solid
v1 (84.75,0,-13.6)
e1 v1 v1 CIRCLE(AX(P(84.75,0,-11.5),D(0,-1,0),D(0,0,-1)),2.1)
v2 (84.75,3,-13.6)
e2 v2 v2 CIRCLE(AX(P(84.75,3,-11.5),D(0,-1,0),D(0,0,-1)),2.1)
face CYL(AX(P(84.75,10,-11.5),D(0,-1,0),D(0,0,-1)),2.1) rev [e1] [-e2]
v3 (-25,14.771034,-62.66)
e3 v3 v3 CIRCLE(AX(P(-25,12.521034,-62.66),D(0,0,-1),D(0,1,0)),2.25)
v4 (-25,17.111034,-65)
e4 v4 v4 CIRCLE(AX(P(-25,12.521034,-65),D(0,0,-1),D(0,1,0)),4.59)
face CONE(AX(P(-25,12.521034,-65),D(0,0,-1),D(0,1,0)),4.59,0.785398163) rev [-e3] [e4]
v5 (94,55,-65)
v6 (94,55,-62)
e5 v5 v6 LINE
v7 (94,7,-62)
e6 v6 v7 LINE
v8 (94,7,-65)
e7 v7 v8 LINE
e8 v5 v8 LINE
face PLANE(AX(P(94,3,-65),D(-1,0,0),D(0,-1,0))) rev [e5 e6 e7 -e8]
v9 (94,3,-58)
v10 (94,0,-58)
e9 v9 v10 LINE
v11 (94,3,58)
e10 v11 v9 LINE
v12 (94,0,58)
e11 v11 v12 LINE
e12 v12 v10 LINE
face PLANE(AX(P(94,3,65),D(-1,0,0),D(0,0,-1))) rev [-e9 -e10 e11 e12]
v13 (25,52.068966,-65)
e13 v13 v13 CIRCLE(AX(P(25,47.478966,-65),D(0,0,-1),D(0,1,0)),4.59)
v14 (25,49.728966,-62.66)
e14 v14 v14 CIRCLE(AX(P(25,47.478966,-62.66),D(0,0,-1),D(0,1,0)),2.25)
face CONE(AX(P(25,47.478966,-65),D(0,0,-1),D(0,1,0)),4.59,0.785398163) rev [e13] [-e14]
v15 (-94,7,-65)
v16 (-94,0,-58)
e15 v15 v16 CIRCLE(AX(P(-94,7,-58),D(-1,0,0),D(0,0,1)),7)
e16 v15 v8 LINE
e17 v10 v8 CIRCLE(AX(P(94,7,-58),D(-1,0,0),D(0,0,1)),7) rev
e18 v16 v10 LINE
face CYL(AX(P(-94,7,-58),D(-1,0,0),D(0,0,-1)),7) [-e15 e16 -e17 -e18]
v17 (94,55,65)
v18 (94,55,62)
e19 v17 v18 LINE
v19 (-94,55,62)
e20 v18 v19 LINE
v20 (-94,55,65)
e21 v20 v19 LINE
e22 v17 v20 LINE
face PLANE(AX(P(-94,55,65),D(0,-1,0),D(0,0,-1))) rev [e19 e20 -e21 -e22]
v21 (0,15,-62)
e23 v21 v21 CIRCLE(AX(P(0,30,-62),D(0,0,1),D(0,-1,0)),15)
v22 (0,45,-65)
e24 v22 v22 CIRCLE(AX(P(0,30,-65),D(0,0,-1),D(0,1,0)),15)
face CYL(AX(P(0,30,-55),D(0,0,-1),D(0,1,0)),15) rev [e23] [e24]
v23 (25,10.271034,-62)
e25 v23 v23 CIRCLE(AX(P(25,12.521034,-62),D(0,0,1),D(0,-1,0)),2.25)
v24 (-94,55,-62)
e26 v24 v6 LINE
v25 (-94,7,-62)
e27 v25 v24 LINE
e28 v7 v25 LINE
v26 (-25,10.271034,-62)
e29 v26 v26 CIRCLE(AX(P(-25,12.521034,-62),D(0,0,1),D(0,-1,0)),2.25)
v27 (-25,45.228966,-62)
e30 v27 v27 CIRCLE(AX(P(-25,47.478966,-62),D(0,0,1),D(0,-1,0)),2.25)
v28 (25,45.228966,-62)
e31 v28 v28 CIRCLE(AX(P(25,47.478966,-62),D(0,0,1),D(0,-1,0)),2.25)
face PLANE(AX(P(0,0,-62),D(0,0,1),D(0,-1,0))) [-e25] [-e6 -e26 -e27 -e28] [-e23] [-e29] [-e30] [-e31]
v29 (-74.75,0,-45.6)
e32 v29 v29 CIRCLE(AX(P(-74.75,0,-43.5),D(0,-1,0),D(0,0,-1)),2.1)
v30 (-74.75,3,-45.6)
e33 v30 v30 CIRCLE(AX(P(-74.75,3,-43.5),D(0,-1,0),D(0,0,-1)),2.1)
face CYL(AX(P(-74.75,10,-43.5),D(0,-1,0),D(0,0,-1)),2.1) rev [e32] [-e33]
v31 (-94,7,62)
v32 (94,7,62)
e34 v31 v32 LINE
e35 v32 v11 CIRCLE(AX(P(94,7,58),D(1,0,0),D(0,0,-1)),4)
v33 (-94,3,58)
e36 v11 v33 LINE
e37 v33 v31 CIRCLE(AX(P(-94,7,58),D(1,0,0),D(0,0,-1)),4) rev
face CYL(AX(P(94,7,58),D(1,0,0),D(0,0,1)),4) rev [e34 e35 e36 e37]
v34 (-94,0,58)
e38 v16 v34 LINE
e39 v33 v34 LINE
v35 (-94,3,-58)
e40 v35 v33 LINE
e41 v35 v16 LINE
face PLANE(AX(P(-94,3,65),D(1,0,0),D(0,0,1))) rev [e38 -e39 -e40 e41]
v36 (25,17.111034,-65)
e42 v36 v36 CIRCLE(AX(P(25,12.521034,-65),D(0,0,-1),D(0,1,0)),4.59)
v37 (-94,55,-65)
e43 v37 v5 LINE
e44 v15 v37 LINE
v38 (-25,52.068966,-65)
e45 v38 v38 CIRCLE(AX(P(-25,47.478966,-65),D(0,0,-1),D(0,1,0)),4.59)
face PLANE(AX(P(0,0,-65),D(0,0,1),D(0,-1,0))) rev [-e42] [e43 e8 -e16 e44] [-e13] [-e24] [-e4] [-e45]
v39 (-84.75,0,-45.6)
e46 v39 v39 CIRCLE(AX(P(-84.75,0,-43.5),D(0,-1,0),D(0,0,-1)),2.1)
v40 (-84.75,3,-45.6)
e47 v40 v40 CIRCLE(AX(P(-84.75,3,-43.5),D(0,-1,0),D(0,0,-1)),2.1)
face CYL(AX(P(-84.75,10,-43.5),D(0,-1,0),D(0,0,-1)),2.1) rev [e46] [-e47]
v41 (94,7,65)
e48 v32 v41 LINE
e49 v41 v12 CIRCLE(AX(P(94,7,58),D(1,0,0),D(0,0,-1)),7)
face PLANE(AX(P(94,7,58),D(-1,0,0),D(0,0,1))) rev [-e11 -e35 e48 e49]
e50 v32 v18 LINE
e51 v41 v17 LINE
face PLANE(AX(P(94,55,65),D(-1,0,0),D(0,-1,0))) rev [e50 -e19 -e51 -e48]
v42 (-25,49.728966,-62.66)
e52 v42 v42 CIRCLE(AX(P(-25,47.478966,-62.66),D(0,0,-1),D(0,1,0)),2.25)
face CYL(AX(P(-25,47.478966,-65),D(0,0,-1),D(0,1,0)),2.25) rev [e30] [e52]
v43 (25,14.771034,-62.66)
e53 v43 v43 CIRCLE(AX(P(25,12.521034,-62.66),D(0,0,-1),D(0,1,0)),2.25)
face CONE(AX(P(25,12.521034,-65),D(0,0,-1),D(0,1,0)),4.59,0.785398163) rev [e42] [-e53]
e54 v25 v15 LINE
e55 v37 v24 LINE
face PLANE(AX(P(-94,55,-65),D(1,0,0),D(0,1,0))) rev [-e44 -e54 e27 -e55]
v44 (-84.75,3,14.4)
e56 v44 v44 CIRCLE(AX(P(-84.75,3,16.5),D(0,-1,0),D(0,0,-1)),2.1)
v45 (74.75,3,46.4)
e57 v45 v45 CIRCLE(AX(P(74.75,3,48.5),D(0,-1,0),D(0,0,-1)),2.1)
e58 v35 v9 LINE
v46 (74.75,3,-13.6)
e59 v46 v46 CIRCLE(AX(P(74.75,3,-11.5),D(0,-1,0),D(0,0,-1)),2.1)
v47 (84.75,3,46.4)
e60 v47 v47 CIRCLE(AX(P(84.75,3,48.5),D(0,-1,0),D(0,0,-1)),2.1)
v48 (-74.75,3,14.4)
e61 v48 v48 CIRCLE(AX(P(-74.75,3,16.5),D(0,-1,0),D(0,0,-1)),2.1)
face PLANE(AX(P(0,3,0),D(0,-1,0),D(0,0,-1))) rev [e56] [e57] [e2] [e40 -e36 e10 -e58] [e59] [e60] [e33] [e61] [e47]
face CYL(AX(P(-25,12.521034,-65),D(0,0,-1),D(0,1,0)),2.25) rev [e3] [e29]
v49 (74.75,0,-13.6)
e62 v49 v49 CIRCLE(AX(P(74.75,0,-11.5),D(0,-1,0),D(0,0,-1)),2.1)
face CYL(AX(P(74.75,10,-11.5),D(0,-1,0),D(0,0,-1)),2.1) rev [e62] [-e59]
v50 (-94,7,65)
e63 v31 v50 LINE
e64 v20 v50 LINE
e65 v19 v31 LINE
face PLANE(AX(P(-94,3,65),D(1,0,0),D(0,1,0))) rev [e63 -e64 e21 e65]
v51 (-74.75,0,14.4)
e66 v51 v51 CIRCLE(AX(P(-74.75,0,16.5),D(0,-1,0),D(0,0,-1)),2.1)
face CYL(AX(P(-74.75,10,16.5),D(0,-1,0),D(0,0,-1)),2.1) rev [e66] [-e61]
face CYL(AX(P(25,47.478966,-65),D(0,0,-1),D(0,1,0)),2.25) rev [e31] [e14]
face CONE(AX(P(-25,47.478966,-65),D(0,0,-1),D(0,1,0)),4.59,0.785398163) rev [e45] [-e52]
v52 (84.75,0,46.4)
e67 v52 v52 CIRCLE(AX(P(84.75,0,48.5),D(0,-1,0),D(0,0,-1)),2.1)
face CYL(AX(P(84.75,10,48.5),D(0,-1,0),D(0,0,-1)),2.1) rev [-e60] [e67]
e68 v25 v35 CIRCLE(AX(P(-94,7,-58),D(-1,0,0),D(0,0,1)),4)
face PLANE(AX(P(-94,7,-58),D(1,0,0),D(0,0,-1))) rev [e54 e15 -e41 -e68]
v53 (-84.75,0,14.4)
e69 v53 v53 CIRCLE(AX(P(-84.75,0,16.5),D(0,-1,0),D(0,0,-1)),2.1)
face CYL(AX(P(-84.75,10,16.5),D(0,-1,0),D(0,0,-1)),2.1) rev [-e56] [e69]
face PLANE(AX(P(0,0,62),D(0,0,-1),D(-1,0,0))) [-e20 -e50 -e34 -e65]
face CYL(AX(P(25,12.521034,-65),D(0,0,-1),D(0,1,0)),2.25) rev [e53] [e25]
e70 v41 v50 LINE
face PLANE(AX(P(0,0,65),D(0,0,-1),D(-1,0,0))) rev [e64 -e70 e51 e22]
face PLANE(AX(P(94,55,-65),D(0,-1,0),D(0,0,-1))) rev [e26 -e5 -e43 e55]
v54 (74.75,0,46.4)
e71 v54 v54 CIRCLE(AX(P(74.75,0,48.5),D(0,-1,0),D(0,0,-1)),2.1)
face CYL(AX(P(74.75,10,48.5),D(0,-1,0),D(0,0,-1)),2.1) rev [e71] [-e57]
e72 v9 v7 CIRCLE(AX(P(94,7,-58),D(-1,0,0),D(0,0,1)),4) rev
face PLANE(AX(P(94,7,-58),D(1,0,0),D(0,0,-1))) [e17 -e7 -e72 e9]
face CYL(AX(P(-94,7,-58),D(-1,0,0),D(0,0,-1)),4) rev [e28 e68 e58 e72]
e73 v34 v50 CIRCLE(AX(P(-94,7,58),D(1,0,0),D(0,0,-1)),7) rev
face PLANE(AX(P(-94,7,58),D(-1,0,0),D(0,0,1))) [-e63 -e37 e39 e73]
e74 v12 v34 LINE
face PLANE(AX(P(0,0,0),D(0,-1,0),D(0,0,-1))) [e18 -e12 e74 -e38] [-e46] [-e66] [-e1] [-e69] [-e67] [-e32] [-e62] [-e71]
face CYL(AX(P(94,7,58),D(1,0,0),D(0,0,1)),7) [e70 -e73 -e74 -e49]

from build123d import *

# Parameters (mm, degrees)
SKETCH1_W                                            = 188
SKETCH1_H                                            = 130
BOSS_EXTRUDE1_DEPTH                                  = 3
EDGE_FLANGE1_STRIP_W                                 = 20
EDGE_FLANGE1_STRIP_H                                 = 3
EDGE_FLANGE1_STRIP_CUT_DEPTH                         = 188
EDGE_FLANGE1_STRIP_2_W                               = 20
EDGE_FLANGE1_STRIP_2_H                               = 3
EDGE_FLANGE1_STRIP_CUT_2_DEPTH                       = 188
EDGE_FLANGE1_DEPTH                                   = 188
EDGE_FLANGE1_BEND_DEPTH                              = 188
SKETCH8_R                                            = 15
CUT_EXTRUDE1_DEPTH                                   = 10
CSK_FOR_M4_HEX_SOCKET_COUNTERSUNK_HEAD_S_D           = 4.5
CSK_FOR_M4_HEX_SOCKET_COUNTERSUNK_HEAD_S_DEPTH       = 10
CSK_FOR_M4_HEX_SOCKET_COUNTERSUNK_HEAD_S_CSINK_D     = 9.18
CSK_FOR_M4_HEX_SOCKET_COUNTERSUNK_HEAD_S_CSINK_ANGLE = 90
CSK_FOR_M4_HEX_SOCKET_COUNTERSUNK_HEAD_S_TIP         = 1.351936393
SKETCH12_R                                           = 2.1
CUT_EXTRUDE2_DEPTH                                   = 10


# Sheet-metal steps are written as plain solids
with BuildPart() as part:
    # Sketch1 → Boss-Extrude1 (new body)
    with BuildSketch(Plane(origin=(0, 0, 0), x_dir=(1, 0, 0), z_dir=(0, 1, 0))):
        Rectangle(SKETCH1_W, SKETCH1_H)
    extrude(amount=BOSS_EXTRUDE1_DEPTH)

    # Edge-Flange1 strip (across the edge) → Edge-Flange1 strip cut (cut)
    with BuildSketch(Plane(origin=(94, 3, -65), x_dir=(0, 0, 1), z_dir=(-1, 0, 0))):
        with Locations((-3, -1.5)):
            Rectangle(EDGE_FLANGE1_STRIP_W, EDGE_FLANGE1_STRIP_H)
    extrude(amount=EDGE_FLANGE1_STRIP_CUT_DEPTH, mode=Mode.SUBTRACT)

    # Edge-Flange1 strip 2 (across the edge) → Edge-Flange1 strip cut 2 (cut)
    with BuildSketch(Plane(origin=(-94, 3, 65), x_dir=(0, 0, -1), z_dir=(1, 0, 0))):
        with Locations((-3, -1.5)):
            Rectangle(EDGE_FLANGE1_STRIP_2_W, EDGE_FLANGE1_STRIP_2_H)
    extrude(amount=EDGE_FLANGE1_STRIP_CUT_2_DEPTH, mode=Mode.SUBTRACT)

    # Edge-Flange1 section (across the edge) → Edge-Flange1 (add)
    with BuildSketch(Plane(origin=(94, 3, -65), x_dir=(0, 0, 1), z_dir=(-1, 0, 0))):
        with BuildLine():
            Line((0, 4), (0, 52))
            Line((0, 52), (3, 52))
            Line((3, 52), (3, 4))
            ThreePointArc((3, 4), (4.171572875, 1.171572875), (7, 0))
            Line((7, 0), (7, -3))
            ThreePointArc((7, -3), (2.050252532, -0.949747468), (0, 4))
        make_face()
    extrude(amount=EDGE_FLANGE1_DEPTH)

    # Edge-Flange1 section 2 (across the edge) → Edge-Flange1 bend (add)
    with BuildSketch(Plane(origin=(-94, 3, 65), x_dir=(0, 0, -1), z_dir=(1, 0, 0))):
        with BuildLine():
            Line((0, 4), (0, 52))
            Line((0, 52), (3, 52))
            Line((3, 52), (3, 4))
            ThreePointArc((3, 4), (4.171572875, 1.171572875), (7, 0))
            Line((7, 0), (7, -3))
            ThreePointArc((7, -3), (2.050252532, -0.949747468), (0, 4))
        make_face()
    extrude(amount=EDGE_FLANGE1_BEND_DEPTH)

    # Sketch8 → Cut-Extrude1 (cut)
    with BuildSketch(Plane(origin=(0, 0, -65), x_dir=(-1, 0, 0), z_dir=(0, 0, -1))):
        with Locations(Location((0, 30, 0), (0, 0, 90))):
            Circle(SKETCH8_R)
    extrude(amount=-CUT_EXTRUDE1_DEPTH, mode=Mode.SUBTRACT)

    # CSK for M4 Hex Socket Countersunk Head Screw1
    with Locations(Plane(origin=(0, 0, -65), x_dir=(-1, 0, 0), z_dir=(0, 0, -1))):
        with Locations((-25, 47.478966411), (-25, 12.521033589), (25, 47.478966411), (25, 12.521033589)):
            CounterSinkHole(CSK_FOR_M4_HEX_SOCKET_COUNTERSUNK_HEAD_S_D / 2, CSK_FOR_M4_HEX_SOCKET_COUNTERSUNK_HEAD_S_CSINK_D / 2, depth=CSK_FOR_M4_HEX_SOCKET_COUNTERSUNK_HEAD_S_DEPTH, counter_sink_angle=CSK_FOR_M4_HEX_SOCKET_COUNTERSUNK_HEAD_S_CSINK_ANGLE)
            with Locations((0, 0, -(CSK_FOR_M4_HEX_SOCKET_COUNTERSUNK_HEAD_S_DEPTH + CSK_FOR_M4_HEX_SOCKET_COUNTERSUNK_HEAD_S_TIP / 2))):  # 118° drill point
                Cone(0, CSK_FOR_M4_HEX_SOCKET_COUNTERSUNK_HEAD_S_D / 2, CSK_FOR_M4_HEX_SOCKET_COUNTERSUNK_HEAD_S_TIP, mode=Mode.SUBTRACT)

    # Sketch12 → Cut-Extrude2 (cut)
    with BuildSketch(Plane(origin=(0, 0, 0), x_dir=(-1, 0, 0), z_dir=(0, -1, 0))):
        with Locations(Location((74.75, 43.5, 0), (0, 0, 90))):
            Circle(SKETCH12_R)
        with Locations(Location((84.75, 43.5, 0), (0, 0, 90))):
            Circle(SKETCH12_R)
        with Locations(Location((74.75, -16.5, 0), (0, 0, 90))):
            Circle(SKETCH12_R)
        with Locations(Location((84.75, -16.5, 0), (0, 0, 90))):
            Circle(SKETCH12_R)
        with Locations(Location((-74.75, 11.5, 0), (0, 0, 90))):
            Circle(SKETCH12_R)
        with Locations(Location((-84.75, 11.5, 0), (0, 0, 90))):
            Circle(SKETCH12_R)
        with Locations(Location((-74.75, -48.5, 0), (0, 0, 90))):
            Circle(SKETCH12_R)
        with Locations(Location((-84.75, -48.5, 0), (0, 0, 90))):
            Circle(SKETCH12_R)
    extrude(amount=-CUT_EXTRUDE2_DEPTH, mode=Mode.SUBTRACT)


solid = part.part
